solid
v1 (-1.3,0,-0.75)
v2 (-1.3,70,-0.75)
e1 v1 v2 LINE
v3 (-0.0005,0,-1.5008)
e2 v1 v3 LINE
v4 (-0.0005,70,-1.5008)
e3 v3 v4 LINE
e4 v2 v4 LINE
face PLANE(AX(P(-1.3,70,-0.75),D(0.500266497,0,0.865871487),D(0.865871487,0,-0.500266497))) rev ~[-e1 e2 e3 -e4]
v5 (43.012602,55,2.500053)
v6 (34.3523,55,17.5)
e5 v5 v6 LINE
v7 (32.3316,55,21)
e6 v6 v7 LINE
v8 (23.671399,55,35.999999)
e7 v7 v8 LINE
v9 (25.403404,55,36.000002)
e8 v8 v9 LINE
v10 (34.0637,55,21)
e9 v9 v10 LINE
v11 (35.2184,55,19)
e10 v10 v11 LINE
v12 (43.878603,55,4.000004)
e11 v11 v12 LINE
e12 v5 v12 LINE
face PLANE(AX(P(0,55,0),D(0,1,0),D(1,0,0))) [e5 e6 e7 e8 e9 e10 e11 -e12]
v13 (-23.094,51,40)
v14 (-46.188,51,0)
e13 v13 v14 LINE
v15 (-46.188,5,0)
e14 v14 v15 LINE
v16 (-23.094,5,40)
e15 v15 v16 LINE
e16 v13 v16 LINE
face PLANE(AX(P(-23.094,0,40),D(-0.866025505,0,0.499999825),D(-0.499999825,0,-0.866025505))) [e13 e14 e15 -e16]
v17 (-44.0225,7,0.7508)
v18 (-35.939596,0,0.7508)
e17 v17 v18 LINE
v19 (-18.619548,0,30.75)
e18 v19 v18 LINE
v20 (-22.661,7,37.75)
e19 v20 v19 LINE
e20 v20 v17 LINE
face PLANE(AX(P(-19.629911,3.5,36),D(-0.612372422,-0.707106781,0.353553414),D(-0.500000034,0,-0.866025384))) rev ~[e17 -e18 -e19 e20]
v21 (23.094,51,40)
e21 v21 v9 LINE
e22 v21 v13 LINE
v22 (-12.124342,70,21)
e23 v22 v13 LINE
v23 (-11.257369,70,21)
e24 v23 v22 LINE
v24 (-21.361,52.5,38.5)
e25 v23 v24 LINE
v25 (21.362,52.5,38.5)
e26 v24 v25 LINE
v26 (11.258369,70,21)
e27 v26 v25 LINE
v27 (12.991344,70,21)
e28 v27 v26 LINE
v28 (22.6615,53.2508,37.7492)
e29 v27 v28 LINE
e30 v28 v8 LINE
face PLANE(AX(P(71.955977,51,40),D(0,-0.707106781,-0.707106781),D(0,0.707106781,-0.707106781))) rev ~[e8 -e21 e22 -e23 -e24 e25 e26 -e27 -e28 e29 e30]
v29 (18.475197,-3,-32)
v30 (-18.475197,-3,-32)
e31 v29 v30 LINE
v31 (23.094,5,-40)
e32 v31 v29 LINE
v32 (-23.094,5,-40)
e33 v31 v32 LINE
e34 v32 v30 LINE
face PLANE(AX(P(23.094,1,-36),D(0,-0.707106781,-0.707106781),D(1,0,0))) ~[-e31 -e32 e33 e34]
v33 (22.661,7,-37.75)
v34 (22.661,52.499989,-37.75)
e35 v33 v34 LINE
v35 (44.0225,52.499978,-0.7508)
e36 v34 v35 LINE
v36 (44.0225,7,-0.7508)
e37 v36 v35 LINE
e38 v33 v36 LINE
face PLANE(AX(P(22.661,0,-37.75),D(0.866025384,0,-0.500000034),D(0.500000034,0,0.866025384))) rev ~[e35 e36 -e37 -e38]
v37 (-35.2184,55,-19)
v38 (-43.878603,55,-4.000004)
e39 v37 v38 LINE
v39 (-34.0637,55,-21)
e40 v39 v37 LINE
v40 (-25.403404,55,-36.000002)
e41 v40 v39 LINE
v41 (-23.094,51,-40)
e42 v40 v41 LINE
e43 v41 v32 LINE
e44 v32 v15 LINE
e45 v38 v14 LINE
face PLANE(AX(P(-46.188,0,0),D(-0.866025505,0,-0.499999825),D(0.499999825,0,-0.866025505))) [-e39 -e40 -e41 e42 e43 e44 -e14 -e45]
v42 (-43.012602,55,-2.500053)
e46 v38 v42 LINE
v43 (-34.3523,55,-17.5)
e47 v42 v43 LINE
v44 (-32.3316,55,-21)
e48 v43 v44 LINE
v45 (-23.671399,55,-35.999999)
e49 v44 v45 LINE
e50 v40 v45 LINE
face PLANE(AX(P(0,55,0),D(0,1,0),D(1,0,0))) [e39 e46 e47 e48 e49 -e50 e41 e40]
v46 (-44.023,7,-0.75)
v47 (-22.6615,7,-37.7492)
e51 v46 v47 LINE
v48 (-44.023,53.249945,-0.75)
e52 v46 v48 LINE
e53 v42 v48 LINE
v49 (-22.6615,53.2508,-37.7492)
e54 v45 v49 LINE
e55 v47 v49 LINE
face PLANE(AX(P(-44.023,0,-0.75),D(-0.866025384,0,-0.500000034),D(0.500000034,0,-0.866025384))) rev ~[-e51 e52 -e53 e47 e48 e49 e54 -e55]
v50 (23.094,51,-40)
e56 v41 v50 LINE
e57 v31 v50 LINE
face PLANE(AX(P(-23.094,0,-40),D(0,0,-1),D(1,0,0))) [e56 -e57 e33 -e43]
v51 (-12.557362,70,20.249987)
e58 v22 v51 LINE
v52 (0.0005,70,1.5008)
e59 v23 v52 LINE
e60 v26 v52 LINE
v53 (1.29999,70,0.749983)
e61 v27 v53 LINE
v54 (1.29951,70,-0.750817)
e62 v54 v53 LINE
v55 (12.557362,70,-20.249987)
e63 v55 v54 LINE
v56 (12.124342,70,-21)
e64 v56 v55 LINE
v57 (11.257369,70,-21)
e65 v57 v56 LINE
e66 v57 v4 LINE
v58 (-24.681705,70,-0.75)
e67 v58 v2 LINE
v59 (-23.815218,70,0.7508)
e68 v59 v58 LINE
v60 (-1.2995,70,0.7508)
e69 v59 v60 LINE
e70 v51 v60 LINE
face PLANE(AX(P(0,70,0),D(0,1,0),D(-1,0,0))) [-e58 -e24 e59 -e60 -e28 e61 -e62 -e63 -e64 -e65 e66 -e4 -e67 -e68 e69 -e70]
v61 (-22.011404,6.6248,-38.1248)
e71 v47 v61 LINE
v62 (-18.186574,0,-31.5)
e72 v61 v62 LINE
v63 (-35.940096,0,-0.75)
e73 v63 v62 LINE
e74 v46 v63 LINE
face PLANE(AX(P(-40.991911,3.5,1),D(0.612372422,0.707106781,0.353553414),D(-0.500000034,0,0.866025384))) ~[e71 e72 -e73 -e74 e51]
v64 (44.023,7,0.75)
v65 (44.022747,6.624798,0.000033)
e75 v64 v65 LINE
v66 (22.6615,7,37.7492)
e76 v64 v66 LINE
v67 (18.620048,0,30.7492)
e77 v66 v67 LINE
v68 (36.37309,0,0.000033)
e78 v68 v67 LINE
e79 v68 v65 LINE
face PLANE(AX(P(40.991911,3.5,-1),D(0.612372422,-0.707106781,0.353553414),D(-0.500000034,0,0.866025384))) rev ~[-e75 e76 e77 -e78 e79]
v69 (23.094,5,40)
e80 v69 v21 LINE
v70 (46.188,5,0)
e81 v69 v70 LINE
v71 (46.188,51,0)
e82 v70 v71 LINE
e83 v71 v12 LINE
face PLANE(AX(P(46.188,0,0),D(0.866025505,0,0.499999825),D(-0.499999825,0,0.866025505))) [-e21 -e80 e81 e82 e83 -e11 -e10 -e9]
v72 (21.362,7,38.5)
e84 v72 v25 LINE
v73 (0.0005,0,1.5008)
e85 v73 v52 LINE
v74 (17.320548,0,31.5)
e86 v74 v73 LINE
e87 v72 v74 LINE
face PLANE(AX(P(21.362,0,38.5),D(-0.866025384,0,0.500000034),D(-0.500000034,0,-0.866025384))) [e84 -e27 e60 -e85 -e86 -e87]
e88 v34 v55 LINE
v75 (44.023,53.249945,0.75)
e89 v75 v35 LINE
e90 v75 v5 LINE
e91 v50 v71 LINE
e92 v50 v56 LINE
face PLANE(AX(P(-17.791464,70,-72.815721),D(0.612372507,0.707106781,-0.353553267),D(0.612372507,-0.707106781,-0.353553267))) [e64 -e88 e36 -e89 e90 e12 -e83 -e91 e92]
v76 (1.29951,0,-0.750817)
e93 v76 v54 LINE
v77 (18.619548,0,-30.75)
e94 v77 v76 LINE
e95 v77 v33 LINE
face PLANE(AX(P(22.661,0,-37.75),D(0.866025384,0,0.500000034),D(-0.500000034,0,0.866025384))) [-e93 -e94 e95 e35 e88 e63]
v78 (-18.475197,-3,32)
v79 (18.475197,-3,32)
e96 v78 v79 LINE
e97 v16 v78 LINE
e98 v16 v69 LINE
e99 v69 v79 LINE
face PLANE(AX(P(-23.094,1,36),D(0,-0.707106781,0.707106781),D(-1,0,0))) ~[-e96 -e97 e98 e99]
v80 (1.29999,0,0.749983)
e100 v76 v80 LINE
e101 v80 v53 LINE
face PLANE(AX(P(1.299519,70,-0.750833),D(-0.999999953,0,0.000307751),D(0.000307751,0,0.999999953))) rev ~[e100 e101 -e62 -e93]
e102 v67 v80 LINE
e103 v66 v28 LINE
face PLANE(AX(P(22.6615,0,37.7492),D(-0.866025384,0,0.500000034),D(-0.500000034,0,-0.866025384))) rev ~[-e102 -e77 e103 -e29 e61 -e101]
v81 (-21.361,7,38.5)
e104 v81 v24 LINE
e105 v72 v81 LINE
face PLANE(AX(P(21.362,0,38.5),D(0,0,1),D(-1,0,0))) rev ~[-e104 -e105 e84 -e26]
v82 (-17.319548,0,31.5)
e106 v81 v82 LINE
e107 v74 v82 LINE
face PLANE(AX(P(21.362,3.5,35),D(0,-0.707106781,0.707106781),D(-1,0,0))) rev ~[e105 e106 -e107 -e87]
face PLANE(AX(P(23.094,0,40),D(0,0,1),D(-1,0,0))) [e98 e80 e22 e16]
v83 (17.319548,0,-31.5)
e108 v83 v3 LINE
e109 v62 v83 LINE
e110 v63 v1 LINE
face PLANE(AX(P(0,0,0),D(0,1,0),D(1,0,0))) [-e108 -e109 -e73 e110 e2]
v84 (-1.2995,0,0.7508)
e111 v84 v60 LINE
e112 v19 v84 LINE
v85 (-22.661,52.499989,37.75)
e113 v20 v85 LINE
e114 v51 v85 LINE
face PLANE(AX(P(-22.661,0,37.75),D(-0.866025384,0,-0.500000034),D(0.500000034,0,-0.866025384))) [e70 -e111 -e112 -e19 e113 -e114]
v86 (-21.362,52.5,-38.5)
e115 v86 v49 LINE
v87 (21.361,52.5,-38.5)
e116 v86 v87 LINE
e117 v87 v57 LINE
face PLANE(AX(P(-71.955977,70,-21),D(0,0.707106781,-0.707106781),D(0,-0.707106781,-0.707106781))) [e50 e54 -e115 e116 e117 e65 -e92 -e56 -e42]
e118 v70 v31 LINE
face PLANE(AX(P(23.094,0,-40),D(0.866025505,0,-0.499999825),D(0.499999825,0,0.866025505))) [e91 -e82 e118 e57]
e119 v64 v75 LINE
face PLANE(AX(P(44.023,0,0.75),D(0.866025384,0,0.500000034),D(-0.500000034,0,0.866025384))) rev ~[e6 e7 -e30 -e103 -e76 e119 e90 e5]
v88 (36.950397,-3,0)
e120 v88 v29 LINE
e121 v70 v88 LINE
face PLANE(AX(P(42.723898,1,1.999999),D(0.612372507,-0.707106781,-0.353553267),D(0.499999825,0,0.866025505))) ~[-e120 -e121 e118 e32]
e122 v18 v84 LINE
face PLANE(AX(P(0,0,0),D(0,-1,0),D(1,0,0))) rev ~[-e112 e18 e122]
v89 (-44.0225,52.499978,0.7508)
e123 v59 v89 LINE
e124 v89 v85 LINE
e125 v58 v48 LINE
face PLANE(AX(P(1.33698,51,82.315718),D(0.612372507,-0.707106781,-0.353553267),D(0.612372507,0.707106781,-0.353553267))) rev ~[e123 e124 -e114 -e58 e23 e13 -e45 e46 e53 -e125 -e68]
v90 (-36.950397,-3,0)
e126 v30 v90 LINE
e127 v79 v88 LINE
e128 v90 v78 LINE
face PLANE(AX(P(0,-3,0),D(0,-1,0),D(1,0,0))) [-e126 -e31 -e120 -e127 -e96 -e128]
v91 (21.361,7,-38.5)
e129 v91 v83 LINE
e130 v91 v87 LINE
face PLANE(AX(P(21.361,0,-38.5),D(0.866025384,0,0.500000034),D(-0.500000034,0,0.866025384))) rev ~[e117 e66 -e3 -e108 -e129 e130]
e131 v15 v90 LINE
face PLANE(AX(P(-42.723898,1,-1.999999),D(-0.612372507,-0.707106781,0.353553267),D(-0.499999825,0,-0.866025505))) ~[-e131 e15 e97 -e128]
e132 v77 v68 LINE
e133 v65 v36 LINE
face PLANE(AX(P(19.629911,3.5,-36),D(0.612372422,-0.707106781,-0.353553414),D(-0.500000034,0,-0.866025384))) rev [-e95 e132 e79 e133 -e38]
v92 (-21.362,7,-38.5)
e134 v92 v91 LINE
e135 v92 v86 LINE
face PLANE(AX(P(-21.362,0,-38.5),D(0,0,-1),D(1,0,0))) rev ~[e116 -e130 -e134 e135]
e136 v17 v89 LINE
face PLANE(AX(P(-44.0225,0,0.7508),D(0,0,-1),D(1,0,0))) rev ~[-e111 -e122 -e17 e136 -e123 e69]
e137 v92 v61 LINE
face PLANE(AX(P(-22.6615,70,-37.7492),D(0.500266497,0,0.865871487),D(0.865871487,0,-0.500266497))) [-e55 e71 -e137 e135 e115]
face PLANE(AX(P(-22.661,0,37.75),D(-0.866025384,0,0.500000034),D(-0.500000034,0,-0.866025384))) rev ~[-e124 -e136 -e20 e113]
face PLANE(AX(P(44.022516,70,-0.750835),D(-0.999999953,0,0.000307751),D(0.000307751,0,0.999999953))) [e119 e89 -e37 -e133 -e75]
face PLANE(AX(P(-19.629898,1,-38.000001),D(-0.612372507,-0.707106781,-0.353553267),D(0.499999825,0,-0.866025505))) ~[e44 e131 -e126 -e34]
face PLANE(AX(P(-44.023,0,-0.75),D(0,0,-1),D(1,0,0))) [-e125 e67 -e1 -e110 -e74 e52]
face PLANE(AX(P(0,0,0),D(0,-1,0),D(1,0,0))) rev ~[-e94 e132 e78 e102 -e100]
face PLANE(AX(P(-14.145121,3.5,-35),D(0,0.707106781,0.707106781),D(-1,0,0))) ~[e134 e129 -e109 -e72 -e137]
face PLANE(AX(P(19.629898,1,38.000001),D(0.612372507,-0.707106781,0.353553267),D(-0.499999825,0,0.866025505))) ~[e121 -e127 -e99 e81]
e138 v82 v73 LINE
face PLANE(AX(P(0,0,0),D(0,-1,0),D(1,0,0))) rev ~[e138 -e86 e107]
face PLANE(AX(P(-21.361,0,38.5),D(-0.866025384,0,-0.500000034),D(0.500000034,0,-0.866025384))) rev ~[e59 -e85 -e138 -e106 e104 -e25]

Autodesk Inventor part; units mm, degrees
ref_plane "YZ Plane" through (0, 0, 0) normal (1, 0, 0) x (0, 1, 0)
ref_plane "XZ Plane" through (0, 0, 0) normal (0, 1, 0) x (-1, 0, 0)
ref_plane "XY Plane" through (0, 0, 0) normal (0, 0, 1) x (1, 0, 0)
sketch "Sketch1" plane through (0, 0, 0) normal (0, 1, 0) x (-1, 0, 0)
  line L0 (-23.094, 40) -> (23.094, 40)
  line L1 (23.094, 40) -> (46.188, 0)
  line L2 (46.188, 0) -> (23.094, -40)
  line L3 (23.094, -40) -> (-23.094, -40)
  line L4 (-23.094, -40) -> (-46.188, 0)
  line L5 (-46.188, 0) -> (-23.094, 40)
  line L6 (0, 0) -> (62.8108, 0)
  line L7 (22.6615, -37.7492) -> (1.3, -0.75)
  line L8 (44.023, -0.75) -> (22.6615, -37.7492)
  line L9 (23.094, -40) -> (0, 0) construction
  line L10 (44.023, -0.75) -> (1.3, -0.75)
  line L11 (22.661, 37.75) -> (44.0225, 0.7508)
  line L12 (44.0225, 0.7508) -> (1.2995, 0.7508)
  line L13 (22.661, 37.75) -> (1.2995, 0.7508)
  line L14 (-21.362, 38.5) -> (21.361, 38.5)
  line L15 (21.361, 38.5) -> (-0.0005, 1.5008)
  line L16 (-21.362, 38.5) -> (-0.0005, 1.5008)
  line L17 (-44.023, 0.75) -> (-22.6615, 37.7492)
  line L18 (-22.6615, 37.7492) -> (-1.3, 0.75)
  line L19 (-44.023, 0.75) -> (-1.3, 0.75)
  line L20 (-22.661, -37.75) -> (-44.0225, -0.7508)
  line L21 (-44.0225, -0.7508) -> (-1.2995, -0.7508)
  line L22 (-22.661, -37.75) -> (-1.2995, -0.7508)
  line L23 (21.362, -38.5) -> (-21.361, -38.5)
  line L24 (-21.361, -38.5) -> (0.0005, -1.5008)
  line L25 (21.362, -38.5) -> (0.0005, -1.5008)
  point P0 (0, 0)
  point P1 (0, 0)
  dimension "d6" = 60
  dimension "d7" = 0.75
  dimension "d8" = 1.5
  dimension "d9" = 1.3
  dimension "d10" = 80
  dimension "d13" = 360
extrude "Extrusion1" add sketch "Sketch1" along normal blind 70
sketch "Sketch2" plane through (0, 0, 0) normal (0, -1, 0) x (1, 0, 0)
  line L0 (23.094, 40) -> (46.188, 0) projected
  line L1 (-23.094, 40) -> (23.094, 40) projected
  line L2 (-46.188, 0) -> (-23.094, 40) projected
  line L3 (-23.094, -40) -> (-46.188, 0) projected
  line L4 (23.094, -40) -> (-23.094, -40) projected
  line L5 (46.188, 0) -> (23.094, -40) projected
  line L6 (-21.362, -38.5) -> (21.361, -38.5) projected
  line L7 (-0.0005, -1.5008) -> (-21.362, -38.5) projected
  line L8 (21.361, -38.5) -> (-0.0005, -1.5008) projected
  line L9 (22.661, -37.75) -> (44.0225, -0.7508) projected
  line L10 (1.2995, -0.7508) -> (22.661, -37.75) projected
  line L11 (44.0225, -0.7508) -> (1.2995, -0.7508) projected
  line L12 (44.023, 0.75) -> (22.6615, 37.7492) projected
  line L13 (1.3, 0.75) -> (44.023, 0.75) projected
  line L14 (22.6615, 37.7492) -> (1.3, 0.75) projected
  line L15 (21.362, 38.5) -> (-21.361, 38.5) projected
  line L16 (0.0005, 1.5008) -> (21.362, 38.5) projected
  line L17 (-21.361, 38.5) -> (0.0005, 1.5008) projected
  line L18 (-22.661, 37.75) -> (-44.0225, 0.7508) projected
  line L19 (-1.2995, 0.7508) -> (-22.661, 37.75) projected
  line L20 (-44.0225, 0.7508) -> (-1.2995, 0.7508) projected
  line L21 (-44.023, -0.75) -> (-22.6615, -37.7492) projected
  line L22 (-1.3, -0.75) -> (-44.023, -0.75) projected
  line L23 (-22.6615, -37.7492) -> (-1.3, -0.75) projected
  point P0 (0, 0)
extrude "Extrusion2" add sketch "Sketch2" along normal blind 3 contours L0 L5 L4 L3 L2 L1 | L7 L8 L6 | L10 L11 L9 | L13 L14 L12 | L16 L17 L15 | L19 L20 L18 | L22 L23 L21
sketch "Sketch4" plane through (0, 70, 0) normal (0, 1, 0) x (1, 0, 0)
  line L0 (23.094, -40) -> (46.188, 0) projected
  line L1 (46.188, 0) -> (23.094, 40) projected
  line L2 (23.094, 40) -> (-23.094, 40) projected
  line L3 (-23.094, 40) -> (-46.188, 0) projected
  line L4 (-46.188, 0) -> (-23.094, -40) projected
  line L5 (-23.094, -40) -> (23.094, -40) projected
  line L6 (-21.362, 38.5) -> (21.361, 38.5) projected
  line L7 (21.361, 38.5) -> (-0.0005, 1.5008) projected
  line L8 (-0.0005, 1.5008) -> (-21.362, 38.5) projected
  line L9 (22.661, 37.75) -> (44.0225, 0.7508) projected
  line L10 (44.0225, 0.7508) -> (1.2995, 0.7508) projected
  line L11 (1.2995, 0.7508) -> (22.661, 37.75) projected
  line L12 (44.023, -0.75) -> (22.6615, -37.7492) projected
  line L13 (22.6615, -37.7492) -> (1.3, -0.75) projected
  line L14 (1.3, -0.75) -> (44.023, -0.75) projected
  line L15 (21.362, -38.5) -> (-21.361, -38.5) projected
  line L16 (-21.361, -38.5) -> (0.0005, -1.5008) projected
  line L17 (0.0005, -1.5008) -> (21.362, -38.5) projected
  line L18 (-22.661, -37.75) -> (-44.0225, -0.7508) projected
  line L19 (-44.0225, -0.7508) -> (-1.2995, -0.7508) projected
  line L20 (-1.2995, -0.7508) -> (-22.661, -37.75) projected
  line L21 (-44.023, 0.75) -> (-22.6615, 37.7492) projected
  line L22 (-22.6615, 37.7492) -> (-1.3, 0.75) projected
  line L23 (-1.3, 0.75) -> (-44.023, 0.75) projected
  line L24 (-1.3, 0.75) -> (-44.023, 0.75) projected
  line L25 (-1.3, 0.75) -> (-0.0005, 1.5008)
  line L26 (-44.023, 0.75) -> (-22.6615, 37.7492) projected
  line L27 (-21.362, 38.5) -> (21.361, 38.5) projected
  line L28 (-22.6615, 37.7492) -> (-21.362, 38.5)
extrude "Extrusion3" cut sketch "Sketch4" against normal up to surface (70 mm away) contours L8 L25 L22 L28
pattern_circular "Circular Pattern1" count 2 over 240 about axis through (0, -10, 0) along (0, 1, 0) of "Extrusion3"
chamfer "Chamfer2" distance 7 angle 45 6 edges at (-0.0005, 0, -38.5) (33.3417, 0, -19.2504) (33.3422, 0, 19.2496) (0.0005, 0, 38.5) (-33.3417, 0, 19.2504) (-33.3422, 0, -19.2496)
chamfer "Chamfer1" distance 8 angle 45 6 edges at (34.641, -3, -20) (34.641, -3, 20) (0, -3, 40) (-34.641, -3, 20) (-34.641, -3, -20) (0, -3, -40)
chamfer "Chamfer3" distance 19 angle 45 2 edges at (34.641, 70, -20) (0, 70, -40)
chamfer "Chamfer4" distance 19 angle 45 2 edges at (0, 70, 40) (-34.641, 70, 20)
sketch "Sketch5" plane through (0, 70, 0) normal (0, 1, 0) x (1, 0, 0)
  line L0 (34.0637, -21) -> (32.3316, -21) projected
  line L1 (34.0637, -21) -> (35.2184, -19) projected
  line L2 (34.3523, -17.5) -> (35.2184, -19) projected
  line L3 (34.3523, -17.5) -> (32.3316, -21) projected
  line L4 (-34.3523, 17.5) -> (-35.2184, 19) projected
  line L5 (-34.3523, 17.5) -> (-32.3316, 21) projected
  line L6 (-34.0637, 21) -> (-32.3316, 21) projected
  line L7 (-34.0637, 21) -> (-35.2184, 19) projected
  line L8 (-23.094, 40) -> (-34.0637, 21) projected
  line L9 (-34.0637, 21) -> (-32.3316, 21) projected
  line L10 (-32.3316, 21) -> (-22.6615, 37.7492) projected
  line L11 (-22.6615, 37.7492) -> (-21.362, 38.5) projected
  line L12 (-21.362, 38.5) -> (21.361, 38.5) projected
  line L13 (21.361, 38.5) -> (11.2574, 21) projected
  line L14 (11.2574, 21) -> (12.1244, 21) projected
  line L15 (12.1244, 21) -> (23.094, 40) projected
  line L16 (23.094, 40) -> (-23.094, 40) projected
  line L17 (-35.2184, 19) -> (-46.188, 0) projected
  line L18 (-46.188, 0) -> (-23.094, -40) projected
  line L19 (-23.094, -40) -> (-12.1244, -21) projected
  line L20 (-12.1244, -21) -> (-12.5574, -20.25) projected
  line L21 (-12.5574, -20.25) -> (-22.661, -37.75) projected
  line L22 (-22.661, -37.75) -> (-44.0225, -0.7508) projected
  line L23 (-44.0225, -0.7508) -> (-23.8152, -0.7508) projected
  line L24 (-23.8152, -0.7508) -> (-24.6817, 0.75) projected
  line L25 (-24.6817, 0.75) -> (-44.023, 0.75) projected
  line L26 (-44.023, 0.75) -> (-34.3523, 17.5) projected
  line L27 (-34.3523, 17.5) -> (-35.2184, 19) projected
  line L28 (12.1244, 21) -> (23.094, 40) projected
  line L29 (12.1244, 21) -> (12.5574, 20.25) projected
  line L30 (12.5574, 20.25) -> (22.661, 37.75) projected
  line L31 (22.661, 37.75) -> (44.0225, 0.7508) projected
  line L32 (44.023, -0.75) -> (34.3523, -17.5) projected
  line L33 (34.3523, -17.5) -> (35.2184, -19) projected
  line L34 (35.2184, -19) -> (46.188, 0) projected
  line L35 (46.188, 0) -> (23.094, 40) projected
  line L36 (-23.094, -40) -> (-12.1244, -21) projected
  line L37 (-23.094, -40) -> (23.094, -40) projected
  line L38 (23.094, -40) -> (34.0637, -21) projected
  line L39 (34.0637, -21) -> (32.3316, -21) projected
  line L40 (32.3316, -21) -> (22.6615, -37.7492) projected
  line L41 (22.6615, -37.7492) -> (12.9913, -21) projected
  line L42 (12.9913, -21) -> (11.2583, -21) projected
  line L43 (11.2583, -21) -> (21.362, -38.5) projected
  line L44 (21.362, -38.5) -> (-21.361, -38.5) projected
  line L45 (-21.361, -38.5) -> (-11.2574, -21) projected
  line L46 (-11.2574, -21) -> (-12.1244, -21) projected
  line L47 (44.023, -0.75) -> (45.755, -0.75)
  line L48 (22.6615, -37.7492) -> (23.5275, -39.2492)
  line L49 (-22.6615, 37.7492) -> (-23.5275, 39.2492)
  line L50 (-44.023, 0.75) -> (-45.755, 0.75)
  line L51 (0.0005, -1.5008) -> (11.2583, -21) projected
  line L52 (44.0225, 0.7508) -> (44.023, -0.75) projected
  point P0 (0, 0)
extrude "Extrusion4" cut sketch "Sketch5" against normal blind 15 contours L38 L48 L40 L0 | L0 L3 L2 L1 | L2 L32 L47 L34 | L17 L4 L26 L50 | L49 L10 L6 L8 | L7 L6 L5 L4
sketch "Sketch6" plane through (0, 70, 0) normal (0, 1, 0) x (1, 0, 0)
  circle A0 centre (-14.6939, 17.2494) radius 16
  ellipse E0 centre (24.2145, -2.943) end of major axis (24.1547, -26.9429) minor radius 17.5
  point P0 (0, 0)
  dimension "d37" = 24
  dimension "d38" = 17.5
  dimension "d36" = 32
properties part number "pen-pot"
